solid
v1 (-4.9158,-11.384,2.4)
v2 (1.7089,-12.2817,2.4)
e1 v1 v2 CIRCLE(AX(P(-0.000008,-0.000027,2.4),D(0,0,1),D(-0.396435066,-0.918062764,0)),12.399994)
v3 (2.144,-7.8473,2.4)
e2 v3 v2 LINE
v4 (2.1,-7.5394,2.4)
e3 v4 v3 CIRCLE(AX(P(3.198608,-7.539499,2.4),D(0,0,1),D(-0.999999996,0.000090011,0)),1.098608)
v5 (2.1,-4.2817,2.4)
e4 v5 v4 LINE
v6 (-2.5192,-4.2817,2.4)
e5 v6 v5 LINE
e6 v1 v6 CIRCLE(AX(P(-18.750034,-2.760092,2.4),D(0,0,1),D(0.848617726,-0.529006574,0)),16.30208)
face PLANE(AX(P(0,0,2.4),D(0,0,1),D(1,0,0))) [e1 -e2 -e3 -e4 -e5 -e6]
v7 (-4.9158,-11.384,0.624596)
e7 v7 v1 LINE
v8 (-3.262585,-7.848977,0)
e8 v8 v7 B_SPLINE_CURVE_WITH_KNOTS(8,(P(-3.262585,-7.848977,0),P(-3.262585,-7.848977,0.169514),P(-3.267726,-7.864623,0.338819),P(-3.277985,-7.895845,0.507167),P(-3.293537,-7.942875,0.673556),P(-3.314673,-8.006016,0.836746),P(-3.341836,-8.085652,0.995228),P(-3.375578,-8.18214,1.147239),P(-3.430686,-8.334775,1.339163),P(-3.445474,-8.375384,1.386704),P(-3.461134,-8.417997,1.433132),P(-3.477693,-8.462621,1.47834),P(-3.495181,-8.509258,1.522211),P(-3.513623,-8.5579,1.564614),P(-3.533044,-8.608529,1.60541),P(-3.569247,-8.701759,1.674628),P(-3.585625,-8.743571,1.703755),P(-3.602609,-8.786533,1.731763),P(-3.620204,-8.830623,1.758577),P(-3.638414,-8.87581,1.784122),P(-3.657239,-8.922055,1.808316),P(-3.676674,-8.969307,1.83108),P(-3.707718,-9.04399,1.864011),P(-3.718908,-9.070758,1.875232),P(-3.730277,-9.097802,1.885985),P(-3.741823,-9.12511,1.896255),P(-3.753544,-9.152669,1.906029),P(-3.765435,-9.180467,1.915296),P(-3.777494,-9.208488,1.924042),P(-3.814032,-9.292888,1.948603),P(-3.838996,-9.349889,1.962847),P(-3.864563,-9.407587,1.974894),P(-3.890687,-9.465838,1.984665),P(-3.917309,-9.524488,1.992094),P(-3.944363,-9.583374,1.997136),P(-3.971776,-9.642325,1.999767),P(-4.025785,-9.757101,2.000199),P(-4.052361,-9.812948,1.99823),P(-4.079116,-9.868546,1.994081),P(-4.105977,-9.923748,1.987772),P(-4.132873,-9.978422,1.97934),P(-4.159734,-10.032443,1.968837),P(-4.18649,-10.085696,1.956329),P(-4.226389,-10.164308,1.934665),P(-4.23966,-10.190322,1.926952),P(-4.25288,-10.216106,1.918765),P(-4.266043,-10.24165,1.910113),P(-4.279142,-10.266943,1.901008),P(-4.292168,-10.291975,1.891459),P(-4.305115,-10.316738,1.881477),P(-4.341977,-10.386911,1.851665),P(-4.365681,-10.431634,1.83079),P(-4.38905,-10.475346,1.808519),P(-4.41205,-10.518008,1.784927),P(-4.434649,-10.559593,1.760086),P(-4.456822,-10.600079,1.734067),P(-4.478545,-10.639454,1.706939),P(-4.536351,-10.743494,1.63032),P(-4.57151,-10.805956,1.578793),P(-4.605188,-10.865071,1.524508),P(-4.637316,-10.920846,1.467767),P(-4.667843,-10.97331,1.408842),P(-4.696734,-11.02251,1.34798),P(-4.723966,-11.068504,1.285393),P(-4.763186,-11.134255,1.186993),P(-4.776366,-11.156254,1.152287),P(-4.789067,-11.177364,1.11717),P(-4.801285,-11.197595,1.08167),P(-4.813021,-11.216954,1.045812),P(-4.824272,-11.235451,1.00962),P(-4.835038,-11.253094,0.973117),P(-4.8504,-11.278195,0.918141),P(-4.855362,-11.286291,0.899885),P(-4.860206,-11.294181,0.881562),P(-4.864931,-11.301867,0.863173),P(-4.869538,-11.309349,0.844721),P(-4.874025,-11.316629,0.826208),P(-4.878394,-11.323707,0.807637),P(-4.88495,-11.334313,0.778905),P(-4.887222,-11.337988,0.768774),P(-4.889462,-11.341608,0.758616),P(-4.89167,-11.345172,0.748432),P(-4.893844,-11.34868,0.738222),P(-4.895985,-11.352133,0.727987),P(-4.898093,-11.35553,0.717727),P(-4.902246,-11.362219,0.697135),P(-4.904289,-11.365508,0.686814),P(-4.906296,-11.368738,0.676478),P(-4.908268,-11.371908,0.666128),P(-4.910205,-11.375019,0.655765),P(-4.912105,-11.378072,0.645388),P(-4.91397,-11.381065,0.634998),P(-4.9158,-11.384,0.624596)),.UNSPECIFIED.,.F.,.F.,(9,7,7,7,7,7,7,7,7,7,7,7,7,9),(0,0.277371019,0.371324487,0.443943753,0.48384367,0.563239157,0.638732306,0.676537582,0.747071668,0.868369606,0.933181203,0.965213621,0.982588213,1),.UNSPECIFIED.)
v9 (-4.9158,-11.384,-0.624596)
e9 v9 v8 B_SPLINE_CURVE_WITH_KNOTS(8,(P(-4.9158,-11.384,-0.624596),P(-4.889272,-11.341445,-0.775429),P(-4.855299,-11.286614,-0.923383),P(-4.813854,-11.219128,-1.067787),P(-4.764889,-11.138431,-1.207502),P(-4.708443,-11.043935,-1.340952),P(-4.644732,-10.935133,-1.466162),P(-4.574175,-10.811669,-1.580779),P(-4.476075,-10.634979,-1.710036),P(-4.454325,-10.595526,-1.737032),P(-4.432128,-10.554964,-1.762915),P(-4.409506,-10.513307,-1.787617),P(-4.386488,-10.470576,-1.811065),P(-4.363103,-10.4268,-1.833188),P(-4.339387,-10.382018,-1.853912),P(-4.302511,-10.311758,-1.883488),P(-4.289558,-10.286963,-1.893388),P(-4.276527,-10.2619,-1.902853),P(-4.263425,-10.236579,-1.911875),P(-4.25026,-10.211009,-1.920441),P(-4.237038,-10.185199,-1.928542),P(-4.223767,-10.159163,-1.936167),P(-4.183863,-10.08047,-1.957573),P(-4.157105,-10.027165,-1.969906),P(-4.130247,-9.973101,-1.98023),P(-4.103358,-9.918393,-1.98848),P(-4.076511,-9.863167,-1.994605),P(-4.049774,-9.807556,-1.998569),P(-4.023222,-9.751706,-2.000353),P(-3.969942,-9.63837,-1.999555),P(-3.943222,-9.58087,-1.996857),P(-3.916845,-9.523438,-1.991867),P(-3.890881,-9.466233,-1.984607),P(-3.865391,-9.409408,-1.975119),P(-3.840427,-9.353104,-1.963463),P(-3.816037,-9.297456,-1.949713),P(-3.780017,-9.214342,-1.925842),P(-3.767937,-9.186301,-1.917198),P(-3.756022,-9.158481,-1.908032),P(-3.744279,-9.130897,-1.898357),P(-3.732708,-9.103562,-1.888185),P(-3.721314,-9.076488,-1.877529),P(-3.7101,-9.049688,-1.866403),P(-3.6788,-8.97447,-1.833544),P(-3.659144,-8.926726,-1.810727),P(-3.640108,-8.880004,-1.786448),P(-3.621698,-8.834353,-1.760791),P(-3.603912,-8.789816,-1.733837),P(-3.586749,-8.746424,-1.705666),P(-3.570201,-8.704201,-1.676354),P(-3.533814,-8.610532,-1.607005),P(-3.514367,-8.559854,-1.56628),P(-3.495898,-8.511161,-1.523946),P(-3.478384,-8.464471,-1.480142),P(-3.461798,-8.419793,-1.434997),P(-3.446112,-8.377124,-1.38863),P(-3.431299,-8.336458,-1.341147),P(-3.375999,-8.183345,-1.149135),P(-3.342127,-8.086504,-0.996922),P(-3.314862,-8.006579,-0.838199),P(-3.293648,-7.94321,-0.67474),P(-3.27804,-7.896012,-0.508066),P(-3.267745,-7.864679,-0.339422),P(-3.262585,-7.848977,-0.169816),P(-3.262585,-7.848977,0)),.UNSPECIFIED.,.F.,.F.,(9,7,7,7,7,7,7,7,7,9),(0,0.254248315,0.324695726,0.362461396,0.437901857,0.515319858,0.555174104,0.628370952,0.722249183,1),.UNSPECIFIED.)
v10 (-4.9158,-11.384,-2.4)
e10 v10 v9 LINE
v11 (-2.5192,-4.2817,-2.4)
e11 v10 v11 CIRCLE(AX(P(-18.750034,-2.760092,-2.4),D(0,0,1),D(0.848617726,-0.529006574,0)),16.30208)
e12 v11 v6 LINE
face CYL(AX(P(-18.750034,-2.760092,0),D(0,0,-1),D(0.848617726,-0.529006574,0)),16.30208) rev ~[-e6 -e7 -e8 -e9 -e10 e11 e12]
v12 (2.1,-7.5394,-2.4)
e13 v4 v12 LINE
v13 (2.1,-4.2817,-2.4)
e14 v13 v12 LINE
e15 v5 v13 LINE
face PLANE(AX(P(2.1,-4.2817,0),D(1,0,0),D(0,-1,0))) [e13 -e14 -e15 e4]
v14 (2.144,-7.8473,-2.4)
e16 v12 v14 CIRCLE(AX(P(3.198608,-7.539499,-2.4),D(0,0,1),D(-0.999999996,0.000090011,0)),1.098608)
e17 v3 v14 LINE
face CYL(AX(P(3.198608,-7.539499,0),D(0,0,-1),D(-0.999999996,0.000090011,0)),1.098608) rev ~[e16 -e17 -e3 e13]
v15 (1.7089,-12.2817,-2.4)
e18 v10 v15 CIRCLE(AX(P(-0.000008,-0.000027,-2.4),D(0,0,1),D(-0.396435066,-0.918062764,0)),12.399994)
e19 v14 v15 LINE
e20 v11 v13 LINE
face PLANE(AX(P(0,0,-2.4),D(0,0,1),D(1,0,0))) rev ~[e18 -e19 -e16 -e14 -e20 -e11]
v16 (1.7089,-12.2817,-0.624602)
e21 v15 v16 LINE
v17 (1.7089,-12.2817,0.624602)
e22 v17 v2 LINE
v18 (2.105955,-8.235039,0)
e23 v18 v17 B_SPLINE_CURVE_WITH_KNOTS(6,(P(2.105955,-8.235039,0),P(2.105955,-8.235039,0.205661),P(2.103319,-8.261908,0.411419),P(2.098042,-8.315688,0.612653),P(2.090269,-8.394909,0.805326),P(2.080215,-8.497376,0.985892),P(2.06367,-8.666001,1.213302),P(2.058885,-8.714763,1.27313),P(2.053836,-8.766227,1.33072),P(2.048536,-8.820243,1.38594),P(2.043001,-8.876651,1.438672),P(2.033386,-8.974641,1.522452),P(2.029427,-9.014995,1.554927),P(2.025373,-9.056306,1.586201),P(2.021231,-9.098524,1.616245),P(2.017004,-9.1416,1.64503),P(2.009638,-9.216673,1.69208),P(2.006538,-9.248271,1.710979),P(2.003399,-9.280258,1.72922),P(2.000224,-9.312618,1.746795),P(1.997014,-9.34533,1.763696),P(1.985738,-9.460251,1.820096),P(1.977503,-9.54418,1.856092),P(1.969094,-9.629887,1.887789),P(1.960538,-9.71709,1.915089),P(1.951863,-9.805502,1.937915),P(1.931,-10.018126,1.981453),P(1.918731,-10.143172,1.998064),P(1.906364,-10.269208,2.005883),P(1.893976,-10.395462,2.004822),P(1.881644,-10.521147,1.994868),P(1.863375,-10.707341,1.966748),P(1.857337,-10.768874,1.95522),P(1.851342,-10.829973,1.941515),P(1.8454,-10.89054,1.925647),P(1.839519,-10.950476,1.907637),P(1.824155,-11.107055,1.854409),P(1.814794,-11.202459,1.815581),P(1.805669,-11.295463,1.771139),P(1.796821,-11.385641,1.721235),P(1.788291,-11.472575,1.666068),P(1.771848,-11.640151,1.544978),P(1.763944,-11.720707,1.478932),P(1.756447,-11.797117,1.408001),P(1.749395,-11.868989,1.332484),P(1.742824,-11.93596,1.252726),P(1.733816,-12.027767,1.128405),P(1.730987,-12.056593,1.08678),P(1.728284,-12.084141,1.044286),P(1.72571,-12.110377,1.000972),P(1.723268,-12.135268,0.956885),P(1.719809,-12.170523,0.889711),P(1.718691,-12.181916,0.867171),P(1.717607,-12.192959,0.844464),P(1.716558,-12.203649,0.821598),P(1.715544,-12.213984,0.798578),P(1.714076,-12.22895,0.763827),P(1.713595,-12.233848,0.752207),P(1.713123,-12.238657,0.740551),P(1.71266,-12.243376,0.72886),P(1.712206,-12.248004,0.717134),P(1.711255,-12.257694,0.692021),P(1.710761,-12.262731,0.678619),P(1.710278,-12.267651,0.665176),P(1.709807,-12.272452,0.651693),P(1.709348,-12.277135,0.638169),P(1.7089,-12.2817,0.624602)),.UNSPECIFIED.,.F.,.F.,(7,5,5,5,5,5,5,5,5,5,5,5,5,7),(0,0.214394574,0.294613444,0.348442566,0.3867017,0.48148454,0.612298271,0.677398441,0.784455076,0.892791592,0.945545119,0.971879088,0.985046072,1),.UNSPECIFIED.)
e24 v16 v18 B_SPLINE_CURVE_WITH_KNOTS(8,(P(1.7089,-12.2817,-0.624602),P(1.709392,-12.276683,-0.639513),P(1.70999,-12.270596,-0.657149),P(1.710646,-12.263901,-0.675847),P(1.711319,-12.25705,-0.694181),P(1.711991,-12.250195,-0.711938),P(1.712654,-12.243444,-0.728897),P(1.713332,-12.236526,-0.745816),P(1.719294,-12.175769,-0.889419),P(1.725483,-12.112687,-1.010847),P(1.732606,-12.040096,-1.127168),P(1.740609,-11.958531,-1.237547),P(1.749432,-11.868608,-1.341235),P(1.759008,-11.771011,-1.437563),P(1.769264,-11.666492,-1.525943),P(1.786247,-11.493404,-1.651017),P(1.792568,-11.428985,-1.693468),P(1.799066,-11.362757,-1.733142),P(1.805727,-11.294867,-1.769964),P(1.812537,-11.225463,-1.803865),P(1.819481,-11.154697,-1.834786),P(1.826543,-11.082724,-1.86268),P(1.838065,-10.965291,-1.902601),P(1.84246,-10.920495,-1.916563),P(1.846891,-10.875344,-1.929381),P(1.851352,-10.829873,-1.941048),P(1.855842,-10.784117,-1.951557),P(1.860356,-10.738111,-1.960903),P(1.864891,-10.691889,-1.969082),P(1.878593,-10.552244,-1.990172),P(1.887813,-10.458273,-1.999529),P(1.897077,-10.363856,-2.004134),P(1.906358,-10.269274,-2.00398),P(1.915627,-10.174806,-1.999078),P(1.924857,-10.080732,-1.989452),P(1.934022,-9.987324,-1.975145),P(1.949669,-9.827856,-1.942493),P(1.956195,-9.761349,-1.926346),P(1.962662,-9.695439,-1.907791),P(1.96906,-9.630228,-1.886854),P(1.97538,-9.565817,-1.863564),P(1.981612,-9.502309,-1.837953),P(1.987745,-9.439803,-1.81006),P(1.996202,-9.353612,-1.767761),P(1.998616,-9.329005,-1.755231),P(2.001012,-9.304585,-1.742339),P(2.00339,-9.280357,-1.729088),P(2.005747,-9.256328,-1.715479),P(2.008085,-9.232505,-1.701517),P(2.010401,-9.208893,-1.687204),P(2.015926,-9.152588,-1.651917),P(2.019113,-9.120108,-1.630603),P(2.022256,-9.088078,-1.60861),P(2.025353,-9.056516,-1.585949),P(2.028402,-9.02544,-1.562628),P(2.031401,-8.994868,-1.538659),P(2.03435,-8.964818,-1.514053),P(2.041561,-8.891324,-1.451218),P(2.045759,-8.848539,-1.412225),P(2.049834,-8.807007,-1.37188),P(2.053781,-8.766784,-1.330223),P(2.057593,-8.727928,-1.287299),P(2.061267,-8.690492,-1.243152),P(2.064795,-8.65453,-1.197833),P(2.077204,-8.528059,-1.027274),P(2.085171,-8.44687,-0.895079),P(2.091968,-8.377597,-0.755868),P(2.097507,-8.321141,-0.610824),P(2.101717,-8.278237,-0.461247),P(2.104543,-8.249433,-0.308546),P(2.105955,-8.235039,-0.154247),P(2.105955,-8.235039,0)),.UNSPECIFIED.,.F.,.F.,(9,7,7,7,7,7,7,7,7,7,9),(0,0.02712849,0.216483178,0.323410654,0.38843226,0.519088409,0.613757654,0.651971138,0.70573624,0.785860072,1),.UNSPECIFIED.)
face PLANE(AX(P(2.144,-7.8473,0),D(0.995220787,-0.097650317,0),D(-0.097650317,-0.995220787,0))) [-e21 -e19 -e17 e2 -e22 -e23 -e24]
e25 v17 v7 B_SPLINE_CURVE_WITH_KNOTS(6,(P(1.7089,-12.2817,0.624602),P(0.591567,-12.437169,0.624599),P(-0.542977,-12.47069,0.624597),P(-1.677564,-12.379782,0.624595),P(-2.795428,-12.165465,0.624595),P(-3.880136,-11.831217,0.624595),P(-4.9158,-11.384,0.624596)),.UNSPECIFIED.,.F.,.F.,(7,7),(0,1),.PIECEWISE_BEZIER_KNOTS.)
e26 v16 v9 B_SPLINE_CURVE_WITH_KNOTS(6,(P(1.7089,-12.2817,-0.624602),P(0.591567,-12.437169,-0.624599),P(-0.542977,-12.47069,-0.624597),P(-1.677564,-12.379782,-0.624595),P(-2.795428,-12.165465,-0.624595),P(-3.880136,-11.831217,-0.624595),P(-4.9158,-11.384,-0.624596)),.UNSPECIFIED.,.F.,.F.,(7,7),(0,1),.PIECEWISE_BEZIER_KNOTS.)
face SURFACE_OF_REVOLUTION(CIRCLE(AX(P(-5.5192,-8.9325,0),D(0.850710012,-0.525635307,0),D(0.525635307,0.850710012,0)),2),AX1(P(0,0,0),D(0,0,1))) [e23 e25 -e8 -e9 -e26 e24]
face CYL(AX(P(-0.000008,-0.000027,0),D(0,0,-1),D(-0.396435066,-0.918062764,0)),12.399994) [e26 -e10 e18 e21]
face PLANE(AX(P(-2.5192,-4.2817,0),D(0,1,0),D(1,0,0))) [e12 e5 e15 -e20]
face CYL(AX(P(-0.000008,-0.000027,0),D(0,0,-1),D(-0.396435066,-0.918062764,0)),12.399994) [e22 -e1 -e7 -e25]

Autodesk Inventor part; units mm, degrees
ref_plane "YZ Plane" through (0, 0, 0) normal (1, 0, 0) x (0, 1, 0)
ref_plane "XZ Plane" through (0, 0, 0) normal (0, 1, 0) x (-1, 0, 0)
sketch "Block1" plane through (0, 0, 0) normal (0, 0, 1) x (1, 0, 0)
  arc A0 (19.4993, -13.8282) -> (19.4817, -14.1291) centre (20.4774, -14.0361) ccw construction
  line L0 (19.4993, -13.8282) -> (20.7824, -7.7917) construction
  arc A1 (21.6494, -6.5302) -> (20.7824, -7.7917) centre (22.7387, -8.2075) ccw construction
  line L1 (21.6494, -6.5302) -> (21.8911, -6.3732) construction
  arc A2 (21.8911, -6.3732) -> (16.2026, -4.7141) centre (18.9149, -5.9962) ccw construction
  arc A3 (16.1932, -4.631) -> (16.2026, -4.7141) centre (16.693, -4.6165) ccw construction
  arc A4 (16.2, -5.1) -> (16.1932, -4.631) centre (0, -5.1) ccw construction
  arc A5 (11.587, -16.123) -> (16.2, -5.1) centre (0, -4.7972) ccw construction
  arc A6 (11.587, -16.123) -> (18.1044, -18.4699) centre (18.9149, -5.9962) ccw construction
  line L2 (19.4817, -14.1291) -> (18.1044, -18.4699) construction
  circle A7 centre (18.9149, -5.9962) radius 1 construction
  arc A8 (21.7954, -6.3313) -> (16.3027, -4.7365) centre (18.9149, -5.9962) ccw
  arc A9 (21.7954, -6.3313) -> (20.6845, -7.7709) centre (22.7387, -8.2075) ccw
  line L3 (20.6845, -7.7709) -> (19.4014, -13.8074)
  arc A10 (19.4014, -13.8074) -> (19.3804, -14.1177) centre (20.4774, -14.0361) ccw
  line L4 (19.3804, -14.1177) -> (18.0329, -18.3647)
  arc A11 (11.7396, -16.1093) -> (18.0329, -18.3647) centre (18.9149, -5.9962) ccw
  arc A12 (11.7396, -16.1093) -> (16.3027, -4.7365) centre (0, -4.7972) ccw
  line L5 (15.5605, -9.6605) -> (20.0788, -10.6209)
  point P0 (17.4447, -9.0721)
  dimension "d0" = 0.1
  dimension "d1" = 8
sketch "Sketch1" plane through (0, 0, 0) normal (0, 0, 1) x (1, 0, 0)
  circle A0 centre (0, 0) radius 10.5 construction
  line L0 (-5.5192, -8.9325) -> (1.2791, -13.1329) construction
  arc A1 (2.2, -7.5394) -> (2.2454, -7.8373) centre (3.2, -7.5394) ccw construction
  line L1 (2.2, -7.5394) -> (2.2, -1.368) construction
  arc A2 (2.7858, 0.0462) -> (2.2, -1.368) centre (4.2, -1.368) ccw construction
  line L2 (2.7858, 0.0462) -> (2.9896, 0.25) construction
  arc A3 (2.9896, 0.25) -> (-2.9195, 0.6901) centre (0, 0) ccw construction
  arc A4 (-2.946, 0.7695) -> (-2.9195, 0.6901) centre (-2.4602, 0.8876) ccw construction
  arc A5 (-2.8419, 0.3121) -> (-2.946, 0.7695) centre (-18.6879, -3.0561) ccw construction
  arc A6 (-5.0623, -11.4291) -> (-2.8419, 0.3121) centre (-18.7508, -2.7598) ccw construction
  arc A7 (-5.0623, -11.4291) -> (1.8007, -12.3696) centre (0, 0) ccw construction
  line L3 (2.2454, -7.8373) -> (1.8007, -12.3696) construction
  circle A8 centre (0, 0) radius 1 construction
  arc A9 (2.8873, 0.2711) -> (-2.817, 0.689) centre (0, 0) ccw
  arc A10 (2.8873, 0.2711) -> (2.1, -1.368) centre (4.2, -1.368) ccw
  line L4 (2.1, -1.368) -> (2.1, -7.5394)
  arc A11 (2.1, -7.5394) -> (2.144, -7.8473) centre (3.2, -7.5394) ccw
  line L5 (2.144, -7.8473) -> (1.7089, -12.2817)
  arc A12 (-4.9158, -11.384) -> (1.7089, -12.2817) centre (0, 0) ccw
  arc A13 (-4.9158, -11.384) -> (-2.817, 0.689) centre (-18.7508, -2.7598) ccw
  line L6 (-2.5192, -4.2817) -> (2.1, -4.2817)
  dimension "d4" = 21
  dimension "d5" = 3
extrude "Extrusion1" add sketch "Sketch1" along normal mid plane 4.8 contours L6 L4 A11 L5 A12 A13
ref_plane "Work Plane1" through (-5.5192, -8.9325, 0) normal (0.85071, -0.5256353, 0) x (0.5256353, 0.85071, 0)
sketch "Sketch2" plane through (-5.5192, -8.9325, 0) normal (0.85071, -0.5256353, 0) x (0.5256353, 0.85071, 0)
  circle A0 centre (0, 0) radius 2
  line L0 (10.5, -2.8) -> (10.5, 2.8) projected
  point P0 (10.5, 0)
  dimension "d6" = 4
revolve "Revolution1" cut sketch "Sketch2" angle 360 about axis through (0, 0, 0) along (0, 0, 1)
properties part number "ORingToolA"
